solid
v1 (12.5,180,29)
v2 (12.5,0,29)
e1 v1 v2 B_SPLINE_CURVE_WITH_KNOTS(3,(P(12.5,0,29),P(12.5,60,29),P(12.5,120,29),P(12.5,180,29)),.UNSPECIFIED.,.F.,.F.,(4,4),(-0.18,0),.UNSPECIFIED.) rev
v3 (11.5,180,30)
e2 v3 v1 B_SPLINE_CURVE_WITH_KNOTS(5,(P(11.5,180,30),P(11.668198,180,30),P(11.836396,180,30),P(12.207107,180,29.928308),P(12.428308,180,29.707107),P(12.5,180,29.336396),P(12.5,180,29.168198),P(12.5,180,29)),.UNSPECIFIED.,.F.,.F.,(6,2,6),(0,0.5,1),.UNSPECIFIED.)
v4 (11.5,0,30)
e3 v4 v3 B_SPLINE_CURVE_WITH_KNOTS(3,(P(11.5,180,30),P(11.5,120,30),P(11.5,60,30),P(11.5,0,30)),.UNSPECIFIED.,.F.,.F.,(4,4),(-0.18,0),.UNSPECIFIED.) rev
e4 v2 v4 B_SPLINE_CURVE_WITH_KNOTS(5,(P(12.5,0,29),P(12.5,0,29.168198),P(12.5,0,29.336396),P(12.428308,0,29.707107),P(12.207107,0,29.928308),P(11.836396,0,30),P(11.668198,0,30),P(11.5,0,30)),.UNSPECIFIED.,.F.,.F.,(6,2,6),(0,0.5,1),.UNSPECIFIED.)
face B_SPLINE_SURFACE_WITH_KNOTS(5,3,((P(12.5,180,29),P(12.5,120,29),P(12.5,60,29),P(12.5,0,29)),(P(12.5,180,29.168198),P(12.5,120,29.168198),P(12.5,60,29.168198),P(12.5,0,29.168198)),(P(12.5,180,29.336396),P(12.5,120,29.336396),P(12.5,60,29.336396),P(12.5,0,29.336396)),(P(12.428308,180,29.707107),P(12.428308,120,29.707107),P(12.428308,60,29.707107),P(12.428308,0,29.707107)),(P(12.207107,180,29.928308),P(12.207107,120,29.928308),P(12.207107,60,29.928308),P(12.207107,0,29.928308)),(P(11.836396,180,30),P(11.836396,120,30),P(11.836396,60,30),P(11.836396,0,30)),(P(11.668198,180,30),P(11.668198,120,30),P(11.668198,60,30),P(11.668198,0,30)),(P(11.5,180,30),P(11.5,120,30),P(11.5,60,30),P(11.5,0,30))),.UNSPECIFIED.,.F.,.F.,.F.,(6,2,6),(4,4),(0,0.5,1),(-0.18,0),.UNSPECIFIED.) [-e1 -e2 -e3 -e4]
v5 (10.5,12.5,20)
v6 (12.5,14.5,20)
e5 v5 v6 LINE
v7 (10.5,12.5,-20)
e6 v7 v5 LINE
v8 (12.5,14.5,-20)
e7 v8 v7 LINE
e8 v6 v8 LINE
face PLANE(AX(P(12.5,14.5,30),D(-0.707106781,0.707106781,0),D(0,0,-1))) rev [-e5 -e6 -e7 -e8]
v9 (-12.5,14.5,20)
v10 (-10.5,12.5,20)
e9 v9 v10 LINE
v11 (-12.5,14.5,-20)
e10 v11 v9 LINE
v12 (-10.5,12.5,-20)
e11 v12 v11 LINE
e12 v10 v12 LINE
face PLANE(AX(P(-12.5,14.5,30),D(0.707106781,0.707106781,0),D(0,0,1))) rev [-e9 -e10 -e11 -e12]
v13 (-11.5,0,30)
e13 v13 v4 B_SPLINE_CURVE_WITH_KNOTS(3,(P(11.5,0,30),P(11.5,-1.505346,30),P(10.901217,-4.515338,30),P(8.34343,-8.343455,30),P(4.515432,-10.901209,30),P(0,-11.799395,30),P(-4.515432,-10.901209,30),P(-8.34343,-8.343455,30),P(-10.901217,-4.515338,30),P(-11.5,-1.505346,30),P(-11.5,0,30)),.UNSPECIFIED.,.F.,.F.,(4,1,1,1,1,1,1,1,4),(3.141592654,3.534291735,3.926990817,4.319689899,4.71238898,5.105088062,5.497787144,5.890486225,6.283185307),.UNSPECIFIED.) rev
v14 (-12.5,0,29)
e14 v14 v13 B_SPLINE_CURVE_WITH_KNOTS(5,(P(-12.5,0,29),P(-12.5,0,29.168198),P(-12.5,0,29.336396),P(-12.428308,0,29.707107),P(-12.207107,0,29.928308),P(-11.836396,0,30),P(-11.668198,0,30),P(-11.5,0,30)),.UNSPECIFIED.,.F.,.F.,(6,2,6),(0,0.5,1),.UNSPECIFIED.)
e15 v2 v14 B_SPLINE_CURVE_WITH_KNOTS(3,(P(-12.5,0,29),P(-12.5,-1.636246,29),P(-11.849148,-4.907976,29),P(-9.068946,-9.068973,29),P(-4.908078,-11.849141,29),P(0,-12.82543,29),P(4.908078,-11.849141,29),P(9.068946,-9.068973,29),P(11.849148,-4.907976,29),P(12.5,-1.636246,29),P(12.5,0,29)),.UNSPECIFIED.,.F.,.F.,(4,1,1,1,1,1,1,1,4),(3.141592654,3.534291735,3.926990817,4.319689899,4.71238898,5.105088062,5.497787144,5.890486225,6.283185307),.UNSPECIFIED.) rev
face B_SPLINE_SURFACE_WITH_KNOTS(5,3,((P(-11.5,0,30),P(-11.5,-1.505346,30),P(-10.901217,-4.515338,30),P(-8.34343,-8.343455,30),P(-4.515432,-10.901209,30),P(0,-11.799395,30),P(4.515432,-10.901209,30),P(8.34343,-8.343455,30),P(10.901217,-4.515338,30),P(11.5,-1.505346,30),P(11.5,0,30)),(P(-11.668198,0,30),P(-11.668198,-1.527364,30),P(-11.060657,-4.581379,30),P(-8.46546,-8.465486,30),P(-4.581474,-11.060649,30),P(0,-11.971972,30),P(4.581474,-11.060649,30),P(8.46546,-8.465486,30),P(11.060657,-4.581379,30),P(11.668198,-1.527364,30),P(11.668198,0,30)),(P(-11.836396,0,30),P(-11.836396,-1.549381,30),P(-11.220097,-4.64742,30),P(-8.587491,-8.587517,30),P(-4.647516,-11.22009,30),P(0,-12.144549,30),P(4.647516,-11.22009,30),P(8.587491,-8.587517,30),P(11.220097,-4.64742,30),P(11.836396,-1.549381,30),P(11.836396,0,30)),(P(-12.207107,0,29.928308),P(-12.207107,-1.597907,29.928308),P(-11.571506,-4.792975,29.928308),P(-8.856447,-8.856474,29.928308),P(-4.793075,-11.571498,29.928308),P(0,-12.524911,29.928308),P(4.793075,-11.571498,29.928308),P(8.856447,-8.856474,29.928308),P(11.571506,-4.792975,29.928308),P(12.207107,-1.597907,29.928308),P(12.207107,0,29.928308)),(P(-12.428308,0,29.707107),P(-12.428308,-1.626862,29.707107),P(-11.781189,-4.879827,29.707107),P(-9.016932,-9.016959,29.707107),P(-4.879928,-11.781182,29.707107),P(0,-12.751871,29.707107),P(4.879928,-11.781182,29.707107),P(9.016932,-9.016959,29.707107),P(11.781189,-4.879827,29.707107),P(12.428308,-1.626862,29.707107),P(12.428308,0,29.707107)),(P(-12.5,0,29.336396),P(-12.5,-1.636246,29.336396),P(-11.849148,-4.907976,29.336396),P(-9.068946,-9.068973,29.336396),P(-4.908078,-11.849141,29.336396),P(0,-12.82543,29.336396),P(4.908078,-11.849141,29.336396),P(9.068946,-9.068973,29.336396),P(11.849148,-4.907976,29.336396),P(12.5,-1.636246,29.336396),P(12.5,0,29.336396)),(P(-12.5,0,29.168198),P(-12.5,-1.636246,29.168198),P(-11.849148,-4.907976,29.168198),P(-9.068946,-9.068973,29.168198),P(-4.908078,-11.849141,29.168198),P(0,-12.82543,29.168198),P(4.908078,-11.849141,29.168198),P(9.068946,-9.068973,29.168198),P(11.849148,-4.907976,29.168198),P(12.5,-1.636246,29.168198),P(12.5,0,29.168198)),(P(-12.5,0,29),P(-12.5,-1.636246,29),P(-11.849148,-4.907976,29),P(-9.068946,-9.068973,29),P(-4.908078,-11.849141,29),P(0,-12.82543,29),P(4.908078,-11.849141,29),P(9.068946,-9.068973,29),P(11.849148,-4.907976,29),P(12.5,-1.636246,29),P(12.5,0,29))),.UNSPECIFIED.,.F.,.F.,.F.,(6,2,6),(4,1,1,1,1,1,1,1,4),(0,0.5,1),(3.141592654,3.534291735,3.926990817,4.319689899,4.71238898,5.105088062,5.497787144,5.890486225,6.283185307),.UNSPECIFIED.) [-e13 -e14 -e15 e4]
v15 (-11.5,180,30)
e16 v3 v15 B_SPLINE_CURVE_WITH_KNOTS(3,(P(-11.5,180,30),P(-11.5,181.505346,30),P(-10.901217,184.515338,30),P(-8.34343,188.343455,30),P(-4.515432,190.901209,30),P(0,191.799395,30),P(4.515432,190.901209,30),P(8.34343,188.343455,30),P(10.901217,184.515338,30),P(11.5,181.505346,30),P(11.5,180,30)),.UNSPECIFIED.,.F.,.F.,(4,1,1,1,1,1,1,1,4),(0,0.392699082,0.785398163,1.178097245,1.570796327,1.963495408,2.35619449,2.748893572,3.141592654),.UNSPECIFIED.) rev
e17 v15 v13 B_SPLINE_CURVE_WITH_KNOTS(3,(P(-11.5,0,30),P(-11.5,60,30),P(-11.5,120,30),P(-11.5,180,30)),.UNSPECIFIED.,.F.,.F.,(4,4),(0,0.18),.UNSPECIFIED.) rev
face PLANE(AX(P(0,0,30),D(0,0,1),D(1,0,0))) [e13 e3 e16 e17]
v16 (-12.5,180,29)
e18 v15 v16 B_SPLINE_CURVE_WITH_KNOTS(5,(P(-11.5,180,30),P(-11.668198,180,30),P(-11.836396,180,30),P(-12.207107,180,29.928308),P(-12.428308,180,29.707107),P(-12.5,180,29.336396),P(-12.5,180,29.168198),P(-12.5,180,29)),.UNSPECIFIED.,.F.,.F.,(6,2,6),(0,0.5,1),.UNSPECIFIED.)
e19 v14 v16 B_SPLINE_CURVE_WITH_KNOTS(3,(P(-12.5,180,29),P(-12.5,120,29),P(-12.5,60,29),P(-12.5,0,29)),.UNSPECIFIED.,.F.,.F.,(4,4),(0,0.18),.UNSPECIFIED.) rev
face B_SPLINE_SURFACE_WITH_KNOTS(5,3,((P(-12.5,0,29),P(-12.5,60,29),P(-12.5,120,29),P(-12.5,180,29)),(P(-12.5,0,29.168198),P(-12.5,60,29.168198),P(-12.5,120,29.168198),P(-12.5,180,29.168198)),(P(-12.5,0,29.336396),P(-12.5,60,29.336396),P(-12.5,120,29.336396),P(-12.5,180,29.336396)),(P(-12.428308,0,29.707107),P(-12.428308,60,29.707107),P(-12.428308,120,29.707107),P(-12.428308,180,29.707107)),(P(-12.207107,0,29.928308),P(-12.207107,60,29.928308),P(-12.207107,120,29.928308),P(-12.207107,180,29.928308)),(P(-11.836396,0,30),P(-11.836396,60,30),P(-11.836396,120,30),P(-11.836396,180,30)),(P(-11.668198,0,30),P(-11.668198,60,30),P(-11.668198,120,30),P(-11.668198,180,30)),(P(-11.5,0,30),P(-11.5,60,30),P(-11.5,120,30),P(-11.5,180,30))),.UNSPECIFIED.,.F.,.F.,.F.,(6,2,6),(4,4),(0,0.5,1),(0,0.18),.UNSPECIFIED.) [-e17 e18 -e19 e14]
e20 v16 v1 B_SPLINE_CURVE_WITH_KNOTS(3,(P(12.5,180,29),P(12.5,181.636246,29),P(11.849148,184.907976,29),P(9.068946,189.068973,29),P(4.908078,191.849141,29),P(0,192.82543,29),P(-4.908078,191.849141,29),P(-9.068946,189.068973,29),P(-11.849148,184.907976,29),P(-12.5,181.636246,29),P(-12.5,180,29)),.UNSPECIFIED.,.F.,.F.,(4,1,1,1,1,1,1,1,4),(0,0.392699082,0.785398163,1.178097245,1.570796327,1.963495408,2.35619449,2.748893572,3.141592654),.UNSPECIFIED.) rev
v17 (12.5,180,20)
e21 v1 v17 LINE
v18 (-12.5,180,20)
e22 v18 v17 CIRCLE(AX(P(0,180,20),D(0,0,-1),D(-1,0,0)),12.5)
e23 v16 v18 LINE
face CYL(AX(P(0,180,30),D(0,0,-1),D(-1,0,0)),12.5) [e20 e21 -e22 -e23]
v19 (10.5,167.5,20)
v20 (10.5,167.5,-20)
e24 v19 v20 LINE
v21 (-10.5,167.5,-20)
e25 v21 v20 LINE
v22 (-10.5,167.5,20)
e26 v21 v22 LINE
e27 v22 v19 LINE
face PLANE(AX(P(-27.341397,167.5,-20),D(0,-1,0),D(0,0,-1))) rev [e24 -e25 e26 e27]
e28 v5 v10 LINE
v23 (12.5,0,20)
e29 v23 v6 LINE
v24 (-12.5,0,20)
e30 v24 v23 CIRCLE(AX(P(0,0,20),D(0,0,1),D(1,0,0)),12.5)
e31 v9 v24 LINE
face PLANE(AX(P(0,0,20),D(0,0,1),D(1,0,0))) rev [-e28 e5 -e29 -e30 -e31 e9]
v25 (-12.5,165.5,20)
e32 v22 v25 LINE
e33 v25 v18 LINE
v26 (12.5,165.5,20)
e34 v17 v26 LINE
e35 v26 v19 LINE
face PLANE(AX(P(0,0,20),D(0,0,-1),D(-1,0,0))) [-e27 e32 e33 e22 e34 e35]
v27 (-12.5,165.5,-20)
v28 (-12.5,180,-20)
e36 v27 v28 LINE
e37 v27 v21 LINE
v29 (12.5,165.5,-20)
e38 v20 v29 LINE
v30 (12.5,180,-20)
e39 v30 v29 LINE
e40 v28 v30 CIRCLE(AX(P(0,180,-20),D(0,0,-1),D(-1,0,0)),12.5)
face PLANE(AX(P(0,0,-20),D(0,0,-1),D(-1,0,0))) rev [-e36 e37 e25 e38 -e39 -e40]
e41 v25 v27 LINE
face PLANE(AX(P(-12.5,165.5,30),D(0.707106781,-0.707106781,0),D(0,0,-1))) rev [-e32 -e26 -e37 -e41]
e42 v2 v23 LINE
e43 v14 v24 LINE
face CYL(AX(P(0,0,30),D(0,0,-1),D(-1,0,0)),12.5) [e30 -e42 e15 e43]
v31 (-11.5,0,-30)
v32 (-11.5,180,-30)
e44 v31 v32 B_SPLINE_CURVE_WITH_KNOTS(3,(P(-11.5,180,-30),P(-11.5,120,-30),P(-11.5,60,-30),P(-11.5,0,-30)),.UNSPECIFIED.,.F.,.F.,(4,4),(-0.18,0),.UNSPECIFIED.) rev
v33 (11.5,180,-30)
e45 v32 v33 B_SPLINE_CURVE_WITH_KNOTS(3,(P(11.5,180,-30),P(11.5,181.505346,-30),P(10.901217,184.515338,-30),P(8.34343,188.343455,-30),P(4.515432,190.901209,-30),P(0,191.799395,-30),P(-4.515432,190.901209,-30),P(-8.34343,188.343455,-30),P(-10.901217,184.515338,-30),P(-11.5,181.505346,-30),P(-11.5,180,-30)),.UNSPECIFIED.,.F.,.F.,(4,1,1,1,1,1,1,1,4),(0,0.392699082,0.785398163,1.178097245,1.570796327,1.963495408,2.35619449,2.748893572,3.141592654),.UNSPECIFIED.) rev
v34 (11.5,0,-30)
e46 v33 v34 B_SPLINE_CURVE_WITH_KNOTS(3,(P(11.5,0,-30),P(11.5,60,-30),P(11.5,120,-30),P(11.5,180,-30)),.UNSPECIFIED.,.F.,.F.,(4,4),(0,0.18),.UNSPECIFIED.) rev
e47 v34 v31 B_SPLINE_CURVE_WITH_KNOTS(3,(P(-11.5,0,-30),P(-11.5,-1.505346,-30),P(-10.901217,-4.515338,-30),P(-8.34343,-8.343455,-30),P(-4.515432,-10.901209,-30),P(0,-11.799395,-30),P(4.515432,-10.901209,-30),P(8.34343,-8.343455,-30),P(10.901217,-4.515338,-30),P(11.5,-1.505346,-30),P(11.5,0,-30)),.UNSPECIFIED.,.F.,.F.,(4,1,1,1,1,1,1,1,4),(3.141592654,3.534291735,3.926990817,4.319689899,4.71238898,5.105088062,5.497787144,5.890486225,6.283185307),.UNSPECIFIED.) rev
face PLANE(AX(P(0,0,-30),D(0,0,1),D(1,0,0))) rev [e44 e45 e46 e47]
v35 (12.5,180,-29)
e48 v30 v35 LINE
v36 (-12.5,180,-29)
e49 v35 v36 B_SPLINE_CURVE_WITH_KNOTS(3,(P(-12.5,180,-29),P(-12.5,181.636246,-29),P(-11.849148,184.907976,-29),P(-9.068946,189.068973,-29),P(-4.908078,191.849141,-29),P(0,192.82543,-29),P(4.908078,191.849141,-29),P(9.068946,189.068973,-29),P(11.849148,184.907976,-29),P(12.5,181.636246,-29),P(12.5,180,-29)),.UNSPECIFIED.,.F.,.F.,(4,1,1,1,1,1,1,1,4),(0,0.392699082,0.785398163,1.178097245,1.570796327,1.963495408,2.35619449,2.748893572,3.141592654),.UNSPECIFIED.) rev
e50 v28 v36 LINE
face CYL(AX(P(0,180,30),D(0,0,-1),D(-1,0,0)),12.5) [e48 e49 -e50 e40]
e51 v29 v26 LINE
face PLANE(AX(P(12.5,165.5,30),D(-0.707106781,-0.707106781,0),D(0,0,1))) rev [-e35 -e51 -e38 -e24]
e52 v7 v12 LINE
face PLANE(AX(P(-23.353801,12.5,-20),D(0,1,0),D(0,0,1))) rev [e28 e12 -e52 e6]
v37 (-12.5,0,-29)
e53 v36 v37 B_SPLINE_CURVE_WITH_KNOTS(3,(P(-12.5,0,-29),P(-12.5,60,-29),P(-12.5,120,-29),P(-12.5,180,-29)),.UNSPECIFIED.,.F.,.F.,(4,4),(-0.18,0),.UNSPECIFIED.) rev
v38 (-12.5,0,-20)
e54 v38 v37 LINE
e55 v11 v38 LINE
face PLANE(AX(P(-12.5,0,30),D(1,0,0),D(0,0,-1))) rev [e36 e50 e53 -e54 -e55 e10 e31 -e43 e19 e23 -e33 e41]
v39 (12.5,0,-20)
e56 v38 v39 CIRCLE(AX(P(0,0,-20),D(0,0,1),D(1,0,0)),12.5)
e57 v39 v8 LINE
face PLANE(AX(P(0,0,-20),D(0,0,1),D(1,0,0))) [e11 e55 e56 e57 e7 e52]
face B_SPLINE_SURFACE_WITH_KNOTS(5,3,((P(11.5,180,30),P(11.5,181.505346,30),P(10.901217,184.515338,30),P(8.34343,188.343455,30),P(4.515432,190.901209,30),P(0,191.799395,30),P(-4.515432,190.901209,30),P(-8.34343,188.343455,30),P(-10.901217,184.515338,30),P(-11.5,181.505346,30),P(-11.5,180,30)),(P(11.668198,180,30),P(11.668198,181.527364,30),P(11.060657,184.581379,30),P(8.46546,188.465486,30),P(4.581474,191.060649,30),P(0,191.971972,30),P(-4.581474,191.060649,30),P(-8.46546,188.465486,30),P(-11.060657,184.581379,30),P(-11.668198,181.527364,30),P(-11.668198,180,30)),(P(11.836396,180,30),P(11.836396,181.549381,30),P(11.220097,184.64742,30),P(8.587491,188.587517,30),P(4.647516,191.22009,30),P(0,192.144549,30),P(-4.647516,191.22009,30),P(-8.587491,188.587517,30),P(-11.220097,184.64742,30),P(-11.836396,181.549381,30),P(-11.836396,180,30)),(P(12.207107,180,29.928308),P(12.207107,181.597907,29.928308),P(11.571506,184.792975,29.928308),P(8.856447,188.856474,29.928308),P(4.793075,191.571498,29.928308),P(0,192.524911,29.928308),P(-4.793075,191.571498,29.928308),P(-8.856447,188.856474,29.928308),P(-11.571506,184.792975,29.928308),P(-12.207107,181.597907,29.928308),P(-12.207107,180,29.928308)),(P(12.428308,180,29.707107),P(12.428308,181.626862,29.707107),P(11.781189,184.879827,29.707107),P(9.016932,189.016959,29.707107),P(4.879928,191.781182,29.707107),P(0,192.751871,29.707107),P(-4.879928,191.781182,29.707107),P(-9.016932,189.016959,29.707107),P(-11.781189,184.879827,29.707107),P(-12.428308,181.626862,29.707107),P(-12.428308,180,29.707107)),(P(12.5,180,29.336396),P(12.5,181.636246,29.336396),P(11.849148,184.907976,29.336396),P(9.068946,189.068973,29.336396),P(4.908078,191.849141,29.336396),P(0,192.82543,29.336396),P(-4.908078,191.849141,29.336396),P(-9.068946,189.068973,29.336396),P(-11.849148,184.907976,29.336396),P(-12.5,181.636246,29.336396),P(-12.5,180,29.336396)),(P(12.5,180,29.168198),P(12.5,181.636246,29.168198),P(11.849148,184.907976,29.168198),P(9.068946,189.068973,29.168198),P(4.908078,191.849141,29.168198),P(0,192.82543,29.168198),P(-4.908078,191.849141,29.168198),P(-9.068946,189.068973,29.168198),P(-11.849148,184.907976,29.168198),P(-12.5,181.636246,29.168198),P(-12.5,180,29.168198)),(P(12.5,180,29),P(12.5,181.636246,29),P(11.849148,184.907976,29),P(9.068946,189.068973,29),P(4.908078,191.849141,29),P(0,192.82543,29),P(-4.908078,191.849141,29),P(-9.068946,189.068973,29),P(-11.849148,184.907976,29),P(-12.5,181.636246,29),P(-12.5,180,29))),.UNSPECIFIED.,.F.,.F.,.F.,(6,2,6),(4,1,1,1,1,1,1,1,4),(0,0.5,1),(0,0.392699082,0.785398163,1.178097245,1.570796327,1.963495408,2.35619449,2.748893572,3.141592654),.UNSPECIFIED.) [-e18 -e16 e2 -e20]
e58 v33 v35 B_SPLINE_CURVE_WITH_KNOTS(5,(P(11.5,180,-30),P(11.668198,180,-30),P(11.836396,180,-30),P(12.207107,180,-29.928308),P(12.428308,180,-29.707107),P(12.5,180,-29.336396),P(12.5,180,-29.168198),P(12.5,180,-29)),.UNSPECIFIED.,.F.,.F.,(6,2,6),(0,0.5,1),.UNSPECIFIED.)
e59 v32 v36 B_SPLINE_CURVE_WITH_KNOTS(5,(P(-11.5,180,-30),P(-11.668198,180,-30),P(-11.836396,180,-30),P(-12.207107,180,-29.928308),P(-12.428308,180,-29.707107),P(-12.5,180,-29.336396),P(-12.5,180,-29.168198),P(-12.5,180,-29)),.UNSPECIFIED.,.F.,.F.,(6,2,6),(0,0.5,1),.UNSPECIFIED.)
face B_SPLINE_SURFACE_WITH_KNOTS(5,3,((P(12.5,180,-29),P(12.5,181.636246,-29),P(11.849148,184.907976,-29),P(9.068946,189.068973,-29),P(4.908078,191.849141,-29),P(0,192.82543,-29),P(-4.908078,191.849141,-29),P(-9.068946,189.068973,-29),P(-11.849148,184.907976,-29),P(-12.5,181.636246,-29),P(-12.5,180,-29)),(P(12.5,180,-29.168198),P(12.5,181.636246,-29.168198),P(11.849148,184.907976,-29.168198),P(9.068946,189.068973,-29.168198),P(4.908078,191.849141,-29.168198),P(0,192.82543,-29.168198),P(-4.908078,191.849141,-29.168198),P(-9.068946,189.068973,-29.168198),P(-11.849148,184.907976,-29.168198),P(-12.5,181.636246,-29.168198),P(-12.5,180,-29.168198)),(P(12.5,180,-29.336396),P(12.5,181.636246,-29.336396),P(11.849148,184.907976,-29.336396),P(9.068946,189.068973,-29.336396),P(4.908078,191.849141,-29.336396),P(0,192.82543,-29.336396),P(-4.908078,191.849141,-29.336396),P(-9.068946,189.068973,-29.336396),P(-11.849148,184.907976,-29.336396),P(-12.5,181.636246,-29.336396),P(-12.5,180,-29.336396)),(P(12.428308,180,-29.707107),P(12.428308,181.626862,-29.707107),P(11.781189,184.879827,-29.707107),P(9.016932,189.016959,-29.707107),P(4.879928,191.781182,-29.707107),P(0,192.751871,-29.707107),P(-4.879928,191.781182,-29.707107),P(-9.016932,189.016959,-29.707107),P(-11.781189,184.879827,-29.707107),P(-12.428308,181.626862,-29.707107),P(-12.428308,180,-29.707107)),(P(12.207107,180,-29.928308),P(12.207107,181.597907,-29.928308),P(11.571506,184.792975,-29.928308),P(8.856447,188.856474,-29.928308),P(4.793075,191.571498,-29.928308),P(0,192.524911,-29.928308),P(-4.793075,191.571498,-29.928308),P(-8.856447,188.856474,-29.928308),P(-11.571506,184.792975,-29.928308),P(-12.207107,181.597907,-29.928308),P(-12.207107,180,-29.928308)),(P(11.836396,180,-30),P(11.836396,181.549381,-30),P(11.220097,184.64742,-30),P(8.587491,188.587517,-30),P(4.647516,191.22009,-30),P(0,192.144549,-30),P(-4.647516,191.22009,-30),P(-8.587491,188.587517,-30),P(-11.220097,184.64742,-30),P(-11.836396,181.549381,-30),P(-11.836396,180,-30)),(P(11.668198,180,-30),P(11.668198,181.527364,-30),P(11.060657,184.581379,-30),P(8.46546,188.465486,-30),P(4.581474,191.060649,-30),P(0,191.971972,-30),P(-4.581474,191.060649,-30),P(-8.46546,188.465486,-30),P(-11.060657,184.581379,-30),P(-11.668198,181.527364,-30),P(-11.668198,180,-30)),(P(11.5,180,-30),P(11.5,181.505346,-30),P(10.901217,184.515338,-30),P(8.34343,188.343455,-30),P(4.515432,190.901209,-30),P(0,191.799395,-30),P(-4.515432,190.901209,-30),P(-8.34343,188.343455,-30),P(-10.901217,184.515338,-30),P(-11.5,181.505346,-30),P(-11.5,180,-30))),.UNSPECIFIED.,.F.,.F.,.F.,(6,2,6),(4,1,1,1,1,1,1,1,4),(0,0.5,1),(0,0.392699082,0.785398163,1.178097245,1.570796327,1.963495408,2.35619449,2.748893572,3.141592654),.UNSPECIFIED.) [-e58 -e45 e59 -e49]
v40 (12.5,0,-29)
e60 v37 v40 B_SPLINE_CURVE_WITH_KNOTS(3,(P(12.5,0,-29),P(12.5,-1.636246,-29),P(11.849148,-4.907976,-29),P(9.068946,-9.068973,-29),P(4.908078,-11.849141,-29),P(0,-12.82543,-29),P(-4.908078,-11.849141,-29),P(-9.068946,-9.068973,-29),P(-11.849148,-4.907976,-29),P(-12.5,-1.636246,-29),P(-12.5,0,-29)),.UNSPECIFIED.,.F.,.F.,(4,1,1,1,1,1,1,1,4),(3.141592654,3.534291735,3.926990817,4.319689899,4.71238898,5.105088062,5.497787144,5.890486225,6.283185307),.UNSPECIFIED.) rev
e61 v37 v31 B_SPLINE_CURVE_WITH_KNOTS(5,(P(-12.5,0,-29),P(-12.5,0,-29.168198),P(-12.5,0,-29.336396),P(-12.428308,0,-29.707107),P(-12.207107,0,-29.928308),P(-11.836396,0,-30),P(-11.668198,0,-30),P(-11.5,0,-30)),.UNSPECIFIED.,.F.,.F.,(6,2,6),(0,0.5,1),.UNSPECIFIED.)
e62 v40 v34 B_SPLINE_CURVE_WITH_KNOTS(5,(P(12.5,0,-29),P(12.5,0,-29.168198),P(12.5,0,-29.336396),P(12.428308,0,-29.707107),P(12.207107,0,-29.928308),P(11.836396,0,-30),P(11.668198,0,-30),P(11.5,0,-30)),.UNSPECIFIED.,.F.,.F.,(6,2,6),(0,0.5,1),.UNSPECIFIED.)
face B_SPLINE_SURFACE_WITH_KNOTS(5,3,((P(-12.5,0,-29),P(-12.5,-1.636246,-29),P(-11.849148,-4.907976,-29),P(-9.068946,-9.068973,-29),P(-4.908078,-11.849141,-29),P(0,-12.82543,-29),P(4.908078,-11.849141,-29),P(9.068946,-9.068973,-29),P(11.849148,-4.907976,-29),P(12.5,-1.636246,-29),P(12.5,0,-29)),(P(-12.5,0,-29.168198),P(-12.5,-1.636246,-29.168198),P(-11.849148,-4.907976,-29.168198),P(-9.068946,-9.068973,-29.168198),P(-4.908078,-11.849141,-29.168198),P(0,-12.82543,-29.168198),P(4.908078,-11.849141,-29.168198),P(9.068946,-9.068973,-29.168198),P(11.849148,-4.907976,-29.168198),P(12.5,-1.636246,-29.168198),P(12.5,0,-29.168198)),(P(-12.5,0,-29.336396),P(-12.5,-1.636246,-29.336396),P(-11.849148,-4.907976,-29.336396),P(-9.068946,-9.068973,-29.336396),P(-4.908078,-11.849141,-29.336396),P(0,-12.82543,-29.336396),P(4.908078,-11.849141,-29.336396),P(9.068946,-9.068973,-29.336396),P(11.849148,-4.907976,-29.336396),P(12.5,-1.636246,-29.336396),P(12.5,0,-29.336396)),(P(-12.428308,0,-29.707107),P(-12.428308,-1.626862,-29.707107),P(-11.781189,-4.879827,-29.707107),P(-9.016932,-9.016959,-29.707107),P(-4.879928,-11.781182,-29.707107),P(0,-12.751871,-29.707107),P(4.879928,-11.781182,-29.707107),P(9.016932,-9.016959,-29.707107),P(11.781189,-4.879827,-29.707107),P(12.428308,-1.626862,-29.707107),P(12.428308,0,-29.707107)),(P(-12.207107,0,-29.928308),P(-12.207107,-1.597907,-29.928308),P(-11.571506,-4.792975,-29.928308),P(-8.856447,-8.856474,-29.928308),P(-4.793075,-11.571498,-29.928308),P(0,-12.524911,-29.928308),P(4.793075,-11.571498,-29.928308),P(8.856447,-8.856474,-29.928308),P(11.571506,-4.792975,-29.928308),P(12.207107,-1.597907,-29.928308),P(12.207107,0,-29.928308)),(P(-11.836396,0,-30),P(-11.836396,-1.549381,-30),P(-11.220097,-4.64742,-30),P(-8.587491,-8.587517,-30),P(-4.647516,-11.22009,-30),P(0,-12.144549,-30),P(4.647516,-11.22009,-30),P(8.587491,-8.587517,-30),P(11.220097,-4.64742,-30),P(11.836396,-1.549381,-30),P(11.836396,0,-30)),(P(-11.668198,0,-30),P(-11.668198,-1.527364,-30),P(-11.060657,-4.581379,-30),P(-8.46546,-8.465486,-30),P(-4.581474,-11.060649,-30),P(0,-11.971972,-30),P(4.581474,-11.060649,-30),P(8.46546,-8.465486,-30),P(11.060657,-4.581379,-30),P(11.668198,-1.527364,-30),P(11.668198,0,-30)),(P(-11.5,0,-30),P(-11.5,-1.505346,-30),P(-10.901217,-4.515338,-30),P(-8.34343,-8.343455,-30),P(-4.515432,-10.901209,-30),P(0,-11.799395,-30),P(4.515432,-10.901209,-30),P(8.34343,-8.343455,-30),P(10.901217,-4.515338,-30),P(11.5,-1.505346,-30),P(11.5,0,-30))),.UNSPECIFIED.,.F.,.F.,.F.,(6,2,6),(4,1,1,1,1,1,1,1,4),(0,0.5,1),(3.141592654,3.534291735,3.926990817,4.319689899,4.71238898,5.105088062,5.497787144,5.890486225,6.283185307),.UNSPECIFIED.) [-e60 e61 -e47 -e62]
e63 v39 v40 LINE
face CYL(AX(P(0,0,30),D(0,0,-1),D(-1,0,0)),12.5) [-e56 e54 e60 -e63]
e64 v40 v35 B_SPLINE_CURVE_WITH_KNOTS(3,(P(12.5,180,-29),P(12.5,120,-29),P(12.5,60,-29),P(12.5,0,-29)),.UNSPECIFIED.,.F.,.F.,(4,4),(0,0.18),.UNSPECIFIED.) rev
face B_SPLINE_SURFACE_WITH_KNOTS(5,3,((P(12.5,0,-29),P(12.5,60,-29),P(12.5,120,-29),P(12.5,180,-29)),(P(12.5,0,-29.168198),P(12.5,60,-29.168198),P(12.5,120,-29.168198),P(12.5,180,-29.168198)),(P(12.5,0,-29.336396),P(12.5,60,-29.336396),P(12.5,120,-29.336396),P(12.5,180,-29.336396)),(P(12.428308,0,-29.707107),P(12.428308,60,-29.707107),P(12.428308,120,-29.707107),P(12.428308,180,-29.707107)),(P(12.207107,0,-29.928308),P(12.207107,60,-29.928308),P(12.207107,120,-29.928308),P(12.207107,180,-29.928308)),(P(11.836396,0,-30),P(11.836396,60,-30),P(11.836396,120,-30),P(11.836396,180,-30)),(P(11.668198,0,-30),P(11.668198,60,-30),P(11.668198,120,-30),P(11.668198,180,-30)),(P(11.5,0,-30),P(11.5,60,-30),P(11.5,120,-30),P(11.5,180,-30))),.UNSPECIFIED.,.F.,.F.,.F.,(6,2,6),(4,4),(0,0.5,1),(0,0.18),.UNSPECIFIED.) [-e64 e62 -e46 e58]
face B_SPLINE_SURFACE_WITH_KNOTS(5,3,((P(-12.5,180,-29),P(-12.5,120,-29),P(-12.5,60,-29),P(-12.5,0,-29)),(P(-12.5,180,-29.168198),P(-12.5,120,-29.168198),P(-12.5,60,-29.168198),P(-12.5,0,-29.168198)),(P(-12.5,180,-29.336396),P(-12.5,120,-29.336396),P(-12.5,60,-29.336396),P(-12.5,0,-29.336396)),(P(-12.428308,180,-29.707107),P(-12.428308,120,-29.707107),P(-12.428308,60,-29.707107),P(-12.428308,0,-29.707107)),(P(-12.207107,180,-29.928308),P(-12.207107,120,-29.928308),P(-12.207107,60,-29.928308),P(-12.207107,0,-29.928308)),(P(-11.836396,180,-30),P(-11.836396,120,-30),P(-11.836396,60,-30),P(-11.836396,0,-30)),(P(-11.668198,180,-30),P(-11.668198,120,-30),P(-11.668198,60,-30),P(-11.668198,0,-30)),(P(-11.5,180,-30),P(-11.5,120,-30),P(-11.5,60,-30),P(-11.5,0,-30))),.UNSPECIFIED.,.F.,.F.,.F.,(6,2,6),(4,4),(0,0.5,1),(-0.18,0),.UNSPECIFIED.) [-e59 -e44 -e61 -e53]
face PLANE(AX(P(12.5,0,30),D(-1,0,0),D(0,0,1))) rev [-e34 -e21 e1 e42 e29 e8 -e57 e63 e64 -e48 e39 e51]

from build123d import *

# Parameters (mm, degrees)
EXTRUDE_1_DEPTH     = 30
SKETCH_2_W          = 46.70760299
SKETCH_2_H          = 25
SKETCH_2_W_2        = 54.68279318
CUT_EXTRUDE_1_DEPTH = 20
CHAMFER_1_SIZE      = 2
FILLET_1_SIZE       = 1


with BuildPart() as part:
    # 草图1 → 凸台-拉伸1 (new, symmetric)
    with BuildSketch(Plane.XY):
        with BuildLine():
            Line((-12.5, 0), (-12.5, 180))
            ThreePointArc((-12.5, 180), (0, 192.5), (12.5, 180))
            Line((12.5, 180), (12.5, 0))
            ThreePointArc((12.5, 0), (0, -12.5), (-12.5, 0))
        make_face()
    extrude(amount=EXTRUDE_1_DEPTH, both=True)

    # 草图2 → 切除-拉伸1 (cut, symmetric)
    with BuildSketch(Plane.XY):
        Rectangle(SKETCH_2_W, SKETCH_2_H)
        with Locations((0, 180)):
            Rectangle(SKETCH_2_W_2, SKETCH_2_H)
    extrude(amount=CUT_EXTRUDE_1_DEPTH, both=True, mode=Mode.SUBTRACT)

    # 倒角1
    chamfer_1_edges = [part.edges().sort_by_distance(p)[0] for p in [
        (-12.5, 167.5, 0),
        (-12.5, 12.5, 0),
        (12.5, 12.5, 0),
        (12.5, 167.5, 0),
    ]]
    chamfer(chamfer_1_edges, length=CHAMFER_1_SIZE)

    # 圆角1
    # a fillet whose section is not a circle: 1 mm, written as the material it takes off along each edge
    with BuildSketch(Plane(origin=(-12.5, 0, 30), x_dir=(0, 0, -1), z_dir=(0, 1, 0)), Plane(origin=(12.5, 180, 30), x_dir=(0, 0, -1), z_dir=(0, -1, 0))) as fillet_1_piece_1:
        with BuildLine():
            add(Edge.make_bspline([(FILLET_1_SIZE, 0), (FILLET_1_SIZE * 0.831801948466, 0), (FILLET_1_SIZE * 0.663603896932, 0), (FILLET_1_SIZE * 0.292893218813, -FILLET_1_SIZE * 0.0716919198361), (FILLET_1_SIZE * 0.0716919198361, -FILLET_1_SIZE * 0.292893218813), (0, -FILLET_1_SIZE * 0.663603896932), (0, -FILLET_1_SIZE * 0.831801948466), (0, -FILLET_1_SIZE)], knots=[0, 0, 0, 0, 0, 0, 0.5, 0.5, 1, 1, 1, 1, 1, 1], degree=5))
            Line((0, -FILLET_1_SIZE), (-FILLET_1_SIZE * 0.02, -FILLET_1_SIZE))
            Line((-FILLET_1_SIZE * 0.02, -FILLET_1_SIZE), (-FILLET_1_SIZE * 0.02, FILLET_1_SIZE * 0.02))
            Line((-FILLET_1_SIZE * 0.02, FILLET_1_SIZE * 0.02), (FILLET_1_SIZE, FILLET_1_SIZE * 0.02))
            Line((FILLET_1_SIZE, FILLET_1_SIZE * 0.02), (FILLET_1_SIZE, 0))
        make_face()
    extrude(amount=180, mode=Mode.SUBTRACT)
    with BuildSketch(Plane(origin=(0, 180, 30), x_dir=(-1, 0, 0), z_dir=(0, -1, 0))) as fillet_1_piece_2:
        with BuildLine():
            add(Edge.make_bspline([(12.5 - FILLET_1_SIZE, 0), (12.5 - FILLET_1_SIZE * 0.831801948466, 0), (12.5 - FILLET_1_SIZE * 0.663603896932, 0), (12.5 - FILLET_1_SIZE * 0.292893218813, FILLET_1_SIZE * 0.0716919198361), (12.5 - FILLET_1_SIZE * 0.0716919198361, FILLET_1_SIZE * 0.292893218813), (12.5, FILLET_1_SIZE * 0.663603896932), (12.5, FILLET_1_SIZE * 0.831801948466), (12.5, FILLET_1_SIZE)], knots=[0, 0, 0, 0, 0, 0, 0.5, 0.5, 1, 1, 1, 1, 1, 1], degree=5))
            Line((12.5, FILLET_1_SIZE), (12.5 + FILLET_1_SIZE * 0.02, FILLET_1_SIZE))
            Line((12.5 + FILLET_1_SIZE * 0.02, FILLET_1_SIZE), (12.5 + FILLET_1_SIZE * 0.02, -FILLET_1_SIZE * 0.02))
            Line((12.5 + FILLET_1_SIZE * 0.02, -FILLET_1_SIZE * 0.02), (12.5 - FILLET_1_SIZE, -FILLET_1_SIZE * 0.02))
            Line((12.5 - FILLET_1_SIZE, -FILLET_1_SIZE * 0.02), (12.5 - FILLET_1_SIZE, 0))
        make_face()
    revolve(axis=Axis((0, 180, 30), (0, 0, -1)), revolution_arc=180, mode=Mode.SUBTRACT)
    with BuildSketch(Plane(origin=(0, 0, 30), x_dir=(1, 0, 0), z_dir=(0, 1, 0))) as fillet_1_piece_3:
        with BuildLine():
            add(Edge.make_bspline([(12.5, FILLET_1_SIZE), (12.5, FILLET_1_SIZE * 0.831801948466), (12.5, FILLET_1_SIZE * 0.663603896932), (12.5 - FILLET_1_SIZE * 0.0716919198361, FILLET_1_SIZE * 0.292893218813), (12.5 - FILLET_1_SIZE * 0.292893218813, FILLET_1_SIZE * 0.0716919198361), (12.5 - FILLET_1_SIZE * 0.663603896932, 0), (12.5 - FILLET_1_SIZE * 0.831801948466, 0), (12.5 - FILLET_1_SIZE, 0)], knots=[0, 0, 0, 0, 0, 0, 0.5, 0.5, 1, 1, 1, 1, 1, 1], degree=5))
            Line((12.5 - FILLET_1_SIZE, 0), (12.5 - FILLET_1_SIZE, -FILLET_1_SIZE * 0.02))
            Line((12.5 - FILLET_1_SIZE, -FILLET_1_SIZE * 0.02), (12.5 + FILLET_1_SIZE * 0.02, -FILLET_1_SIZE * 0.02))
            Line((12.5 + FILLET_1_SIZE * 0.02, -FILLET_1_SIZE * 0.02), (12.5 + FILLET_1_SIZE * 0.02, FILLET_1_SIZE))
            Line((12.5 + FILLET_1_SIZE * 0.02, FILLET_1_SIZE), (12.5, FILLET_1_SIZE))
        make_face()
    revolve(axis=Axis((0, 0, 30), (0, 0, -1)), revolution_arc=180, mode=Mode.SUBTRACT)
    with BuildSketch(Plane(origin=(12.5, 180, -30), x_dir=(0, 0, 1), z_dir=(0, -1, 0)), Plane(origin=(-12.5, 0, -30), x_dir=(0, 0, 1), z_dir=(0, 1, 0))) as fillet_1_piece_4:
        with BuildLine():
            add(Edge.make_bspline([(FILLET_1_SIZE, 0), (FILLET_1_SIZE * 0.831801948466, 0), (FILLET_1_SIZE * 0.663603896932, 0), (FILLET_1_SIZE * 0.292893218813, FILLET_1_SIZE * 0.0716919198361), (FILLET_1_SIZE * 0.0716919198361, FILLET_1_SIZE * 0.292893218813), (0, FILLET_1_SIZE * 0.663603896932), (0, FILLET_1_SIZE * 0.831801948466), (0, FILLET_1_SIZE)], knots=[0, 0, 0, 0, 0, 0, 0.5, 0.5, 1, 1, 1, 1, 1, 1], degree=5))
            Line((0, FILLET_1_SIZE), (-FILLET_1_SIZE * 0.02, FILLET_1_SIZE))
            Line((-FILLET_1_SIZE * 0.02, FILLET_1_SIZE), (-FILLET_1_SIZE * 0.02, -FILLET_1_SIZE * 0.02))
            Line((-FILLET_1_SIZE * 0.02, -FILLET_1_SIZE * 0.02), (FILLET_1_SIZE, -FILLET_1_SIZE * 0.02))
            Line((FILLET_1_SIZE, -FILLET_1_SIZE * 0.02), (FILLET_1_SIZE, 0))
        make_face()
    extrude(amount=180, mode=Mode.SUBTRACT)
    with BuildSketch(Plane(origin=(0, 180, -30), x_dir=(-1, 0, 0), z_dir=(0, -1, 0))) as fillet_1_piece_5:
        with BuildLine():
            add(Edge.make_bspline([(12.5, -FILLET_1_SIZE), (12.5, -FILLET_1_SIZE * 0.831801948466), (12.5, -FILLET_1_SIZE * 0.663603896932), (12.5 - FILLET_1_SIZE * 0.0716919198361, -FILLET_1_SIZE * 0.292893218813), (12.5 - FILLET_1_SIZE * 0.292893218813, -FILLET_1_SIZE * 0.0716919198361), (12.5 - FILLET_1_SIZE * 0.663603896932, 0), (12.5 - FILLET_1_SIZE * 0.831801948466, 0), (12.5 - FILLET_1_SIZE, 0)], knots=[0, 0, 0, 0, 0, 0, 0.5, 0.5, 1, 1, 1, 1, 1, 1], degree=5))
            Line((12.5 - FILLET_1_SIZE, 0), (12.5 - FILLET_1_SIZE, FILLET_1_SIZE * 0.02))
            Line((12.5 - FILLET_1_SIZE, FILLET_1_SIZE * 0.02), (12.5 + FILLET_1_SIZE * 0.02, FILLET_1_SIZE * 0.02))
            Line((12.5 + FILLET_1_SIZE * 0.02, FILLET_1_SIZE * 0.02), (12.5 + FILLET_1_SIZE * 0.02, -FILLET_1_SIZE))
            Line((12.5 + FILLET_1_SIZE * 0.02, -FILLET_1_SIZE), (12.5, -FILLET_1_SIZE))
        make_face()
    revolve(axis=Axis((0, 180, -30), (0, 0, -1)), revolution_arc=180, mode=Mode.SUBTRACT)
    with BuildSketch(Plane(origin=(0, 0, -30), x_dir=(1, 0, 0), z_dir=(0, 1, 0))) as fillet_1_piece_6:
        with BuildLine():
            add(Edge.make_bspline([(12.5 - FILLET_1_SIZE, 0), (12.5 - FILLET_1_SIZE * 0.831801948466, 0), (12.5 - FILLET_1_SIZE * 0.663603896932, 0), (12.5 - FILLET_1_SIZE * 0.292893218813, -FILLET_1_SIZE * 0.0716919198361), (12.5 - FILLET_1_SIZE * 0.0716919198361, -FILLET_1_SIZE * 0.292893218813), (12.5, -FILLET_1_SIZE * 0.663603896932), (12.5, -FILLET_1_SIZE * 0.831801948466), (12.5, -FILLET_1_SIZE)], knots=[0, 0, 0, 0, 0, 0, 0.5, 0.5, 1, 1, 1, 1, 1, 1], degree=5))
            Line((12.5, -FILLET_1_SIZE), (12.5 + FILLET_1_SIZE * 0.02, -FILLET_1_SIZE))
            Line((12.5 + FILLET_1_SIZE * 0.02, -FILLET_1_SIZE), (12.5 + FILLET_1_SIZE * 0.02, FILLET_1_SIZE * 0.02))
            Line((12.5 + FILLET_1_SIZE * 0.02, FILLET_1_SIZE * 0.02), (12.5 - FILLET_1_SIZE, FILLET_1_SIZE * 0.02))
            Line((12.5 - FILLET_1_SIZE, FILLET_1_SIZE * 0.02), (12.5 - FILLET_1_SIZE, 0))
        make_face()
    revolve(axis=Axis((0, 0, -30), (0, 0, -1)), revolution_arc=180, mode=Mode.SUBTRACT)


solid = part.part
